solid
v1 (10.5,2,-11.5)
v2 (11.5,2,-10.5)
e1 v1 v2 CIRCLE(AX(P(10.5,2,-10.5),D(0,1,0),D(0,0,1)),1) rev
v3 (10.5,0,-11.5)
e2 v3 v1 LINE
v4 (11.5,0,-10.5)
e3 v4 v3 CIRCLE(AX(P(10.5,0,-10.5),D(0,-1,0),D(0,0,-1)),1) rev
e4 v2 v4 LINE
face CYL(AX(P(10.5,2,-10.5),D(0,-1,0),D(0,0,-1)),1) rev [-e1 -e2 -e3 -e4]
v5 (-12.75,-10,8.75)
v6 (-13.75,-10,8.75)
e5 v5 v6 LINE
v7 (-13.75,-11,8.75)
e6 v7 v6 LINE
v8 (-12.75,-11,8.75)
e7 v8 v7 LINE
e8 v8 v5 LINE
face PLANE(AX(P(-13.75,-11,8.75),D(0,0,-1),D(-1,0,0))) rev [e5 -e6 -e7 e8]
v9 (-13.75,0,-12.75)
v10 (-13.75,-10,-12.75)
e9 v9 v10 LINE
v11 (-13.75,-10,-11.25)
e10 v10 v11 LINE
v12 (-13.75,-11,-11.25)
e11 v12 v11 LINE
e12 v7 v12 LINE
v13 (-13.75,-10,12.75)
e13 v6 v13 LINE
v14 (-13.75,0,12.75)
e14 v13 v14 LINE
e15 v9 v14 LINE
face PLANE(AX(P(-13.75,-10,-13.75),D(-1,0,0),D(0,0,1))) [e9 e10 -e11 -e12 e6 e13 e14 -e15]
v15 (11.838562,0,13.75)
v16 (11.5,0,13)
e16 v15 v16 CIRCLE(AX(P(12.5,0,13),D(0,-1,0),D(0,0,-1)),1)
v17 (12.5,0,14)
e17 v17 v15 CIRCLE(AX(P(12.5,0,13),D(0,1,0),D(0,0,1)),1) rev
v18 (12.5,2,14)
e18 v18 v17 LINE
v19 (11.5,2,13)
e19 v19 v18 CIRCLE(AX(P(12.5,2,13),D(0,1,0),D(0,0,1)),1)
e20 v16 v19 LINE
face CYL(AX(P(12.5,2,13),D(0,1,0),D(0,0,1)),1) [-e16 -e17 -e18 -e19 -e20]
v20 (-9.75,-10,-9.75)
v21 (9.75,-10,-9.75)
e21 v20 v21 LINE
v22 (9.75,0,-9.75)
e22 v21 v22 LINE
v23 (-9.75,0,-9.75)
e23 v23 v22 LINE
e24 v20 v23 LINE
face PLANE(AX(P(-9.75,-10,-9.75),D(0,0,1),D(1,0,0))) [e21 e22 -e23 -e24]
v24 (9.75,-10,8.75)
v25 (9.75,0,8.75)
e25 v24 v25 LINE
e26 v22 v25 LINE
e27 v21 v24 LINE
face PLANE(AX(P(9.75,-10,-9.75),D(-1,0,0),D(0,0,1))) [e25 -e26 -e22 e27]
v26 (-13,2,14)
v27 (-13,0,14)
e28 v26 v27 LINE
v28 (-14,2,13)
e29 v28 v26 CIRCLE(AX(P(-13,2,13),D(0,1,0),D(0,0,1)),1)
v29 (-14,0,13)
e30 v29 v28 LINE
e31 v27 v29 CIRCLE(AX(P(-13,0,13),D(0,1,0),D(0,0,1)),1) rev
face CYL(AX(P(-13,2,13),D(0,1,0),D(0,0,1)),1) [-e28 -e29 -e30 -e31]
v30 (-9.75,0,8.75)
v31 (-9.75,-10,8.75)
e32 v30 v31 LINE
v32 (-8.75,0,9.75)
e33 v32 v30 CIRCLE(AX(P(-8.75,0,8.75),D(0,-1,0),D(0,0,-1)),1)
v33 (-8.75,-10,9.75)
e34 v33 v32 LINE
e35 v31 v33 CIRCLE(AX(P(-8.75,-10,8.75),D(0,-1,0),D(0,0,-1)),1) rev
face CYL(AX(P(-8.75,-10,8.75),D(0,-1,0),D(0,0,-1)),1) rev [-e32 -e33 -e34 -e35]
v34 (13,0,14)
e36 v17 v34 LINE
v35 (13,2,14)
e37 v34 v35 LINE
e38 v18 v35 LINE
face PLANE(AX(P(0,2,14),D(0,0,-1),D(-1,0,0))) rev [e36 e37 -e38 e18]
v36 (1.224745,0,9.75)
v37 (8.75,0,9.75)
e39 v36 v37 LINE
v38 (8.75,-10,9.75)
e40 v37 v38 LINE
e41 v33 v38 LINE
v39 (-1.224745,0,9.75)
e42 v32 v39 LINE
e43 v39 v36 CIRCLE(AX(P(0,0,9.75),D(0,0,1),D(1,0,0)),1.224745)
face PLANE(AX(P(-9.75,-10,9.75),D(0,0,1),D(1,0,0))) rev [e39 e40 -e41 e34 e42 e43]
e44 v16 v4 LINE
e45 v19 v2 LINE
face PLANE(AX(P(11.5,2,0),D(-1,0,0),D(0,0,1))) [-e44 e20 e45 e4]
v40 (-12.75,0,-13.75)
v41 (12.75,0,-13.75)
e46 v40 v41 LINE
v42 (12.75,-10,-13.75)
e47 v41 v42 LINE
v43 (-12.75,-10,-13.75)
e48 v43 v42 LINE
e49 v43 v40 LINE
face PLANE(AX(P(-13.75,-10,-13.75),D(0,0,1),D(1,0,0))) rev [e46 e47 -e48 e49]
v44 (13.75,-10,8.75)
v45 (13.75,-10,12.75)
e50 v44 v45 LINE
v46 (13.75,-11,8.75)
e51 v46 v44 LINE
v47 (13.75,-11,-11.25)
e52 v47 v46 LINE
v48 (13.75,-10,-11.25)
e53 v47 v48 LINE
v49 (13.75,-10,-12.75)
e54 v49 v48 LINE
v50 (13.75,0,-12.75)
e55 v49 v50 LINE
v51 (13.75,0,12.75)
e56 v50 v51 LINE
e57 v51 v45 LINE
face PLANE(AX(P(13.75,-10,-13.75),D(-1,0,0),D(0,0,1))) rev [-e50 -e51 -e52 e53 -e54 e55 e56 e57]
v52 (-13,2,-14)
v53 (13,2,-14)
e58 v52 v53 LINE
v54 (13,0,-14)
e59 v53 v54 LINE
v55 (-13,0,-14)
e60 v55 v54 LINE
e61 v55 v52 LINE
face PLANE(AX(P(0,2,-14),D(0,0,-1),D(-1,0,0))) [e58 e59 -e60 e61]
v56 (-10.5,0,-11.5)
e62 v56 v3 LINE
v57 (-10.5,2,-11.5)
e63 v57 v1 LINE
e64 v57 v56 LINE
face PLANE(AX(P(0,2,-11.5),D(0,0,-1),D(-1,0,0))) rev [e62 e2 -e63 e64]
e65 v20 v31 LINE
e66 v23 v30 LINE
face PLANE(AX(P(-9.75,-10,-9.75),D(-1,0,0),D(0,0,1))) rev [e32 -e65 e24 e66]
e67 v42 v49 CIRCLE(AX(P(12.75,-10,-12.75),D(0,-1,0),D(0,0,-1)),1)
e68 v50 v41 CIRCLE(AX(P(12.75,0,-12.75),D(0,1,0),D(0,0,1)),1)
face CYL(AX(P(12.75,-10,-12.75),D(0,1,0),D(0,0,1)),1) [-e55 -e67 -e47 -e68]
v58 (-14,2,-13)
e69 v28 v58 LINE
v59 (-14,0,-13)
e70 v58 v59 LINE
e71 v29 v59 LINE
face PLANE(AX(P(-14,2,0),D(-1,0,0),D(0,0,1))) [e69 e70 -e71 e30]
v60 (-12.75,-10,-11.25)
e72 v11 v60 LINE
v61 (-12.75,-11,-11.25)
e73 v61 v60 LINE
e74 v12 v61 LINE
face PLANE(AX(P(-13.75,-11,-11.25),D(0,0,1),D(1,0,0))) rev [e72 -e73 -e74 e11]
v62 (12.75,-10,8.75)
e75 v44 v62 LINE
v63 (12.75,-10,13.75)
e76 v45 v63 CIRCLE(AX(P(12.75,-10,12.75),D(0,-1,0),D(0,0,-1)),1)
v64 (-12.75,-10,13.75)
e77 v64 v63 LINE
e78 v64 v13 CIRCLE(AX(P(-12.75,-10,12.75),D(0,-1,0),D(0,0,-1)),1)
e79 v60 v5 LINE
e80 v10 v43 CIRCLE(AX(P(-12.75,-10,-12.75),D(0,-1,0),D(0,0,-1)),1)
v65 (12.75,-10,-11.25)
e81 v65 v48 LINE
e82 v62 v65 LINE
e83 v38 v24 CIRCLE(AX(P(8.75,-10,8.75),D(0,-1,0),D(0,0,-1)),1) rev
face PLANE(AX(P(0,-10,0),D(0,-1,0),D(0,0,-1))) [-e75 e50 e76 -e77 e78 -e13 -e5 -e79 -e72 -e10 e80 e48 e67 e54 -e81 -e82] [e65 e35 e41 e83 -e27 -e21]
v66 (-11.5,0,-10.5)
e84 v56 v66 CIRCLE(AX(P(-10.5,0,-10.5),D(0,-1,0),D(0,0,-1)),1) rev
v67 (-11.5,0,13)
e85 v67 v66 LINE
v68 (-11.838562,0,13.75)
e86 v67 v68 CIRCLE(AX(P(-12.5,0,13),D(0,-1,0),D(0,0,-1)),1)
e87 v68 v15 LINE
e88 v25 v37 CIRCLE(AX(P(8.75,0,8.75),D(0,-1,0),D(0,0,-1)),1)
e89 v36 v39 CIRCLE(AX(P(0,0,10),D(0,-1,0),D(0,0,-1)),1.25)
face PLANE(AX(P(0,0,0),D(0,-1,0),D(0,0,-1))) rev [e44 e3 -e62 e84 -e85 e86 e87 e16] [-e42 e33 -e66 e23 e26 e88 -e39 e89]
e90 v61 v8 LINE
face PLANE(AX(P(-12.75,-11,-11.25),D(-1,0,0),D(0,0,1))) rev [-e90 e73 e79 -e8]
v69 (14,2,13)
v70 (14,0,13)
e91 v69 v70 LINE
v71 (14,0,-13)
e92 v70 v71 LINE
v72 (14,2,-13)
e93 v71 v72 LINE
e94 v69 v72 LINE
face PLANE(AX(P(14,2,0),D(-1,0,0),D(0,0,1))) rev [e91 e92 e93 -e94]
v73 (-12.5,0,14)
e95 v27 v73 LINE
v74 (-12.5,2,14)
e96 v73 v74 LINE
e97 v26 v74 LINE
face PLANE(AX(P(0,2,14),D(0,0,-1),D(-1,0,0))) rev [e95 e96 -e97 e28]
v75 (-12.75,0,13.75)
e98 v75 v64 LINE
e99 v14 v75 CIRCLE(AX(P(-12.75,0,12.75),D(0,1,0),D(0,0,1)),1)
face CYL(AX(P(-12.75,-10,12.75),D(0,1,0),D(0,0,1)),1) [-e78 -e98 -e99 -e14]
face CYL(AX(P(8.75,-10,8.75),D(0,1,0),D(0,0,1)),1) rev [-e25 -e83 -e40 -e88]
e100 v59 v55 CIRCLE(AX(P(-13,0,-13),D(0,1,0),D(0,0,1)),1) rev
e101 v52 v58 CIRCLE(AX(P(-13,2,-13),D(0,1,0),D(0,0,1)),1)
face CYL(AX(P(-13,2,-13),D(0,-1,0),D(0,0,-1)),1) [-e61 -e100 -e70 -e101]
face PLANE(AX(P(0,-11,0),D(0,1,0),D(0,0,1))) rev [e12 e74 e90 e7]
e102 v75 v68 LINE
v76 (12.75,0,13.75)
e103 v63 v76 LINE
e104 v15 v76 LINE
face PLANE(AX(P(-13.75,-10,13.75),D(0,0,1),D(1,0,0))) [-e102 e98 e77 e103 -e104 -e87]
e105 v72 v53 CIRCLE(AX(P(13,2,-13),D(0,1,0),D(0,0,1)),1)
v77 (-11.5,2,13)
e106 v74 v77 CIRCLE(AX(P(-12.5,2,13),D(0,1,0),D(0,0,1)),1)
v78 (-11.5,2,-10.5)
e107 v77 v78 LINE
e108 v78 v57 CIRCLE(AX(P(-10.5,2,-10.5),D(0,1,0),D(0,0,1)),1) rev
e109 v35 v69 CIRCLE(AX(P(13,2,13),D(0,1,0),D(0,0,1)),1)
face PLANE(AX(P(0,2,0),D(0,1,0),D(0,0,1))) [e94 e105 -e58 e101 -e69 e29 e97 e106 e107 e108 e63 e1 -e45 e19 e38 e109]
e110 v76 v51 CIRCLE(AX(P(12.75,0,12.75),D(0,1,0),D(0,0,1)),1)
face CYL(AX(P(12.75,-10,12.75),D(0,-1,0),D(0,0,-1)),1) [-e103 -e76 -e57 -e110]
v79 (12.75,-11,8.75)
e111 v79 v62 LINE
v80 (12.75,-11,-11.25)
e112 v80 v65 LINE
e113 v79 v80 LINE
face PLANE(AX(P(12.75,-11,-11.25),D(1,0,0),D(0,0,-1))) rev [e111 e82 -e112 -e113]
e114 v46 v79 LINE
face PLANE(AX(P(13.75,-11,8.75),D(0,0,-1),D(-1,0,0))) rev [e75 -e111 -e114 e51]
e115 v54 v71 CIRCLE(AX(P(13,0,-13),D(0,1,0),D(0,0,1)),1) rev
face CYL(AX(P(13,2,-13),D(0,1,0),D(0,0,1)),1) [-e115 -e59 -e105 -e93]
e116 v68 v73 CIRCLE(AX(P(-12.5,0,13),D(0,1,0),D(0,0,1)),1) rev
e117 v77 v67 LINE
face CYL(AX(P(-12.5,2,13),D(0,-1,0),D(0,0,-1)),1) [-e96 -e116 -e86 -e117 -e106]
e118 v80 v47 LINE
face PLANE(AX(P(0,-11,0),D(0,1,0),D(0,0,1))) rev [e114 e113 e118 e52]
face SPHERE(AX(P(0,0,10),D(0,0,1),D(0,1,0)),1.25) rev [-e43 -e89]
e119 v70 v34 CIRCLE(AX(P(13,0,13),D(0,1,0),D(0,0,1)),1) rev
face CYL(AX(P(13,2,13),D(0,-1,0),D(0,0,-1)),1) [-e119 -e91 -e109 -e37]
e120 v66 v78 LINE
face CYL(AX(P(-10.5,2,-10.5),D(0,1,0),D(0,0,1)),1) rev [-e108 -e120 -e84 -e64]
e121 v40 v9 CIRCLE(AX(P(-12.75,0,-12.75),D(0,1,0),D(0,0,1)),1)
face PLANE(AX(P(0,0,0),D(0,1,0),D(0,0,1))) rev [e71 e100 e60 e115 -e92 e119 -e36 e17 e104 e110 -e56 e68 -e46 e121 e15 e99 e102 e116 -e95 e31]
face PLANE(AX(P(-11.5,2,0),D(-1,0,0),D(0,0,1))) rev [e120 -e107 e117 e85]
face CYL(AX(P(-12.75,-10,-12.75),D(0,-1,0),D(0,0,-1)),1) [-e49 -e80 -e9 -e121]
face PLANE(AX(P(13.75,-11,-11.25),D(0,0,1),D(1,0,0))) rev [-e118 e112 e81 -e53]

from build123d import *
from build123d.topology import SkipClean

# Parameters (mm, degrees)
BOSS_EXTRUDE1_DEPTH = 2
SKETCH3_W           = 27.5
SKETCH3_H           = 27.5
SKETCH3_W_2         = 19.5
SKETCH3_H_2         = 19.5
BOSS_EXTRUDE2_DEPTH = 10
SKETCH4_W           = 1
SKETCH4_H           = 20
BOSS_EXTRUDE3_DEPTH = 1
FILLET2_R           = 1


with BuildPart() as part:
    # Sketch1 → Boss-Extrude1 (new body)
    with BuildSketch(Plane(origin=(0, 0, 0), x_dir=(1, 0, 0), z_dir=(0, 1, 0))):
        Polygon((-14, 14), (-14, -14), (-11.5, -14), (-11.5, 11.5), (11.5, 11.5), (11.5, -14), (14, -14), (14, 14), align=None)
    extrude(amount=BOSS_EXTRUDE1_DEPTH)

    # Sketch3 → Boss-Extrude2 (add)
    with BuildSketch(Plane.XZ):
        Rectangle(SKETCH3_W, SKETCH3_H)
        Rectangle(SKETCH3_W_2, SKETCH3_H_2, mode=Mode.SUBTRACT)
    extrude(amount=BOSS_EXTRUDE2_DEPTH)

    # Sketch4 → Boss-Extrude3 (add)
    with BuildSketch(Plane.XZ.offset(10)):
        with Locations((-13.25, -1.25)):
            Rectangle(SKETCH4_W, SKETCH4_H)
        with Locations((13.25, -1.25)):
            Rectangle(SKETCH4_W, SKETCH4_H)
    extrude(amount=BOSS_EXTRUDE3_DEPTH)

    # Sketch5 → Cut-Revolve4 (revolve, cut)
    with SkipClean():  # the faces are left unmerged after this step: merging them gives an invalid solid
        with BuildSketch(Plane(origin=(0, 0, 0), x_dir=(0, 0, -1), z_dir=(1, 0, 0))):
            with BuildLine():
                ThreePointArc((-8.75, 0), (-10, 1.25), (-11.25, 0))
                Line((-11.25, 0), (-8.75, 0))
            make_face()
            with BuildLine():
                Line((-8.75, 0), (-11.25, 0))
                ThreePointArc((-11.25, 0), (-10, -1.25), (-8.75, 0))
            make_face()
        revolve(axis=Axis((0, 0, 1000), (0, 0, -1)), mode=Mode.SUBTRACT)
    add(part.part.scale(1), mode=Mode.REPLACE)  # the faces are merged on a copy

    # Fillet2
    # the kernel refuses this fillet: 1 mm, written as the material it adds along each edge
    with BuildSketch(Plane(origin=(11.5, -2.5, -11.5), x_dir=(0, 0, 1), z_dir=(0, 1, 0))) as fillet2_piece_1:
        with BuildLine():
            CenterArc((FILLET2_R, -FILLET2_R), FILLET2_R, 90, 90)
            Line((0, -FILLET2_R), (0, 0))
            Line((0, 0), (FILLET2_R, 0))
        make_face()
    extrude(amount=4.5)
    with BuildSketch(Plane(origin=(-11.5, -2.5, -11.5), x_dir=(0, 0, 1), z_dir=(0, 1, 0))) as fillet2_piece_2:
        with BuildLine():
            CenterArc((FILLET2_R, FILLET2_R), FILLET2_R, 180, 90)
            Line((0, FILLET2_R), (0, 0))
            Line((0, 0), (FILLET2_R, 0))
        make_face()
    extrude(amount=4.5)
    with BuildSketch(Plane(origin=(-9.75, 0, 9.75), x_dir=(0, 0, -1), z_dir=(0, -1, 0))) as fillet2_piece_3:
        with BuildLine():
            CenterArc((FILLET2_R, FILLET2_R), FILLET2_R, 180, 90)
            Line((0, FILLET2_R), (0, 0))
            Line((0, 0), (FILLET2_R, 0))
        make_face()
    extrude(amount=10)
    with BuildSketch(Plane(origin=(9.75, 0, 9.75), x_dir=(0, 0, -1), z_dir=(0, -1, 0))) as fillet2_piece_4:
        with BuildLine():
            CenterArc((FILLET2_R, -FILLET2_R), FILLET2_R, 90, 90)
            Line((0, -FILLET2_R), (0, 0))
            Line((0, 0), (FILLET2_R, 0))
        make_face()
    extrude(amount=10)
    # the kernel refuses this fillet: 1 mm, written as the material it takes off along each edge
    with BuildSketch(Plane(origin=(-11.5, 0, 14), x_dir=(-1, 0, 0), z_dir=(0, 1, 0))) as fillet2_2_piece_1:
        with BuildLine():
            CenterArc((FILLET2_R, -FILLET2_R), FILLET2_R, 90, 90)
            Line((0, -FILLET2_R), (0, 0))
            Line((0, 0), (FILLET2_R, 0))
        make_face()
    extrude(amount=4.5, mode=Mode.SUBTRACT)
    with BuildSketch(Plane(origin=(-14, -2.5, 14), x_dir=(0, 0, -1), z_dir=(0, 1, 0))) as fillet2_2_piece_2:
        with BuildLine():
            CenterArc((FILLET2_R, -FILLET2_R), FILLET2_R, 90, 90)
            Line((0, -FILLET2_R), (0, 0))
            Line((0, 0), (FILLET2_R, 0))
        make_face()
    extrude(amount=7, mode=Mode.SUBTRACT)
    with BuildSketch(Plane(origin=(-14, -2.5, -14), x_dir=(0, 0, 1), z_dir=(0, 1, 0)), Plane(origin=(14, -2.5, -14), x_dir=(-1, 0, 0), z_dir=(0, 1, 0)), Plane(origin=(14, -2.5, 14), x_dir=(0, 0, -1), z_dir=(0, 1, 0))) as fillet2_2_piece_3:
        with BuildLine():
            CenterArc((FILLET2_R, FILLET2_R), FILLET2_R, 180, 90)
            Line((0, FILLET2_R), (0, 0))
            Line((0, 0), (FILLET2_R, 0))
        make_face()
    extrude(amount=7, mode=Mode.SUBTRACT)
    with BuildSketch(Plane(origin=(11.5, 0, 14), x_dir=(1, 0, 0), z_dir=(0, 1, 0))) as fillet2_2_piece_4:
        with BuildLine():
            CenterArc((FILLET2_R, FILLET2_R), FILLET2_R, 180, 90)
            Line((0, FILLET2_R), (0, 0))
            Line((0, 0), (FILLET2_R, 0))
        make_face()
    extrude(amount=4.5, mode=Mode.SUBTRACT)
    with BuildSketch(Plane(origin=(13.75, 0, 13.75), x_dir=(-1, 0, 0), z_dir=(0, -1, 0)), Plane(origin=(-13.75, 0, -13.75), x_dir=(1, 0, 0), z_dir=(0, -1, 0)), Plane(origin=(13.75, 0, -13.75), x_dir=(0, 0, 1), z_dir=(0, -1, 0))) as fillet2_2_piece_5:
        with BuildLine():
            CenterArc((FILLET2_R, FILLET2_R), FILLET2_R, 180, 90)
            Line((0, FILLET2_R), (0, 0))
            Line((0, 0), (FILLET2_R, 0))
        make_face()
    extrude(amount=12.5, mode=Mode.SUBTRACT)
    with BuildSketch(Plane(origin=(-13.75, 0, 13.75), x_dir=(1, 0, 0), z_dir=(0, -1, 0))) as fillet2_2_piece_6:
        with BuildLine():
            CenterArc((FILLET2_R, -FILLET2_R), FILLET2_R, 90, 90)
            Line((0, -FILLET2_R), (0, 0))
            Line((0, 0), (FILLET2_R, 0))
        make_face()
    extrude(amount=12.5, mode=Mode.SUBTRACT)


solid = part.part
